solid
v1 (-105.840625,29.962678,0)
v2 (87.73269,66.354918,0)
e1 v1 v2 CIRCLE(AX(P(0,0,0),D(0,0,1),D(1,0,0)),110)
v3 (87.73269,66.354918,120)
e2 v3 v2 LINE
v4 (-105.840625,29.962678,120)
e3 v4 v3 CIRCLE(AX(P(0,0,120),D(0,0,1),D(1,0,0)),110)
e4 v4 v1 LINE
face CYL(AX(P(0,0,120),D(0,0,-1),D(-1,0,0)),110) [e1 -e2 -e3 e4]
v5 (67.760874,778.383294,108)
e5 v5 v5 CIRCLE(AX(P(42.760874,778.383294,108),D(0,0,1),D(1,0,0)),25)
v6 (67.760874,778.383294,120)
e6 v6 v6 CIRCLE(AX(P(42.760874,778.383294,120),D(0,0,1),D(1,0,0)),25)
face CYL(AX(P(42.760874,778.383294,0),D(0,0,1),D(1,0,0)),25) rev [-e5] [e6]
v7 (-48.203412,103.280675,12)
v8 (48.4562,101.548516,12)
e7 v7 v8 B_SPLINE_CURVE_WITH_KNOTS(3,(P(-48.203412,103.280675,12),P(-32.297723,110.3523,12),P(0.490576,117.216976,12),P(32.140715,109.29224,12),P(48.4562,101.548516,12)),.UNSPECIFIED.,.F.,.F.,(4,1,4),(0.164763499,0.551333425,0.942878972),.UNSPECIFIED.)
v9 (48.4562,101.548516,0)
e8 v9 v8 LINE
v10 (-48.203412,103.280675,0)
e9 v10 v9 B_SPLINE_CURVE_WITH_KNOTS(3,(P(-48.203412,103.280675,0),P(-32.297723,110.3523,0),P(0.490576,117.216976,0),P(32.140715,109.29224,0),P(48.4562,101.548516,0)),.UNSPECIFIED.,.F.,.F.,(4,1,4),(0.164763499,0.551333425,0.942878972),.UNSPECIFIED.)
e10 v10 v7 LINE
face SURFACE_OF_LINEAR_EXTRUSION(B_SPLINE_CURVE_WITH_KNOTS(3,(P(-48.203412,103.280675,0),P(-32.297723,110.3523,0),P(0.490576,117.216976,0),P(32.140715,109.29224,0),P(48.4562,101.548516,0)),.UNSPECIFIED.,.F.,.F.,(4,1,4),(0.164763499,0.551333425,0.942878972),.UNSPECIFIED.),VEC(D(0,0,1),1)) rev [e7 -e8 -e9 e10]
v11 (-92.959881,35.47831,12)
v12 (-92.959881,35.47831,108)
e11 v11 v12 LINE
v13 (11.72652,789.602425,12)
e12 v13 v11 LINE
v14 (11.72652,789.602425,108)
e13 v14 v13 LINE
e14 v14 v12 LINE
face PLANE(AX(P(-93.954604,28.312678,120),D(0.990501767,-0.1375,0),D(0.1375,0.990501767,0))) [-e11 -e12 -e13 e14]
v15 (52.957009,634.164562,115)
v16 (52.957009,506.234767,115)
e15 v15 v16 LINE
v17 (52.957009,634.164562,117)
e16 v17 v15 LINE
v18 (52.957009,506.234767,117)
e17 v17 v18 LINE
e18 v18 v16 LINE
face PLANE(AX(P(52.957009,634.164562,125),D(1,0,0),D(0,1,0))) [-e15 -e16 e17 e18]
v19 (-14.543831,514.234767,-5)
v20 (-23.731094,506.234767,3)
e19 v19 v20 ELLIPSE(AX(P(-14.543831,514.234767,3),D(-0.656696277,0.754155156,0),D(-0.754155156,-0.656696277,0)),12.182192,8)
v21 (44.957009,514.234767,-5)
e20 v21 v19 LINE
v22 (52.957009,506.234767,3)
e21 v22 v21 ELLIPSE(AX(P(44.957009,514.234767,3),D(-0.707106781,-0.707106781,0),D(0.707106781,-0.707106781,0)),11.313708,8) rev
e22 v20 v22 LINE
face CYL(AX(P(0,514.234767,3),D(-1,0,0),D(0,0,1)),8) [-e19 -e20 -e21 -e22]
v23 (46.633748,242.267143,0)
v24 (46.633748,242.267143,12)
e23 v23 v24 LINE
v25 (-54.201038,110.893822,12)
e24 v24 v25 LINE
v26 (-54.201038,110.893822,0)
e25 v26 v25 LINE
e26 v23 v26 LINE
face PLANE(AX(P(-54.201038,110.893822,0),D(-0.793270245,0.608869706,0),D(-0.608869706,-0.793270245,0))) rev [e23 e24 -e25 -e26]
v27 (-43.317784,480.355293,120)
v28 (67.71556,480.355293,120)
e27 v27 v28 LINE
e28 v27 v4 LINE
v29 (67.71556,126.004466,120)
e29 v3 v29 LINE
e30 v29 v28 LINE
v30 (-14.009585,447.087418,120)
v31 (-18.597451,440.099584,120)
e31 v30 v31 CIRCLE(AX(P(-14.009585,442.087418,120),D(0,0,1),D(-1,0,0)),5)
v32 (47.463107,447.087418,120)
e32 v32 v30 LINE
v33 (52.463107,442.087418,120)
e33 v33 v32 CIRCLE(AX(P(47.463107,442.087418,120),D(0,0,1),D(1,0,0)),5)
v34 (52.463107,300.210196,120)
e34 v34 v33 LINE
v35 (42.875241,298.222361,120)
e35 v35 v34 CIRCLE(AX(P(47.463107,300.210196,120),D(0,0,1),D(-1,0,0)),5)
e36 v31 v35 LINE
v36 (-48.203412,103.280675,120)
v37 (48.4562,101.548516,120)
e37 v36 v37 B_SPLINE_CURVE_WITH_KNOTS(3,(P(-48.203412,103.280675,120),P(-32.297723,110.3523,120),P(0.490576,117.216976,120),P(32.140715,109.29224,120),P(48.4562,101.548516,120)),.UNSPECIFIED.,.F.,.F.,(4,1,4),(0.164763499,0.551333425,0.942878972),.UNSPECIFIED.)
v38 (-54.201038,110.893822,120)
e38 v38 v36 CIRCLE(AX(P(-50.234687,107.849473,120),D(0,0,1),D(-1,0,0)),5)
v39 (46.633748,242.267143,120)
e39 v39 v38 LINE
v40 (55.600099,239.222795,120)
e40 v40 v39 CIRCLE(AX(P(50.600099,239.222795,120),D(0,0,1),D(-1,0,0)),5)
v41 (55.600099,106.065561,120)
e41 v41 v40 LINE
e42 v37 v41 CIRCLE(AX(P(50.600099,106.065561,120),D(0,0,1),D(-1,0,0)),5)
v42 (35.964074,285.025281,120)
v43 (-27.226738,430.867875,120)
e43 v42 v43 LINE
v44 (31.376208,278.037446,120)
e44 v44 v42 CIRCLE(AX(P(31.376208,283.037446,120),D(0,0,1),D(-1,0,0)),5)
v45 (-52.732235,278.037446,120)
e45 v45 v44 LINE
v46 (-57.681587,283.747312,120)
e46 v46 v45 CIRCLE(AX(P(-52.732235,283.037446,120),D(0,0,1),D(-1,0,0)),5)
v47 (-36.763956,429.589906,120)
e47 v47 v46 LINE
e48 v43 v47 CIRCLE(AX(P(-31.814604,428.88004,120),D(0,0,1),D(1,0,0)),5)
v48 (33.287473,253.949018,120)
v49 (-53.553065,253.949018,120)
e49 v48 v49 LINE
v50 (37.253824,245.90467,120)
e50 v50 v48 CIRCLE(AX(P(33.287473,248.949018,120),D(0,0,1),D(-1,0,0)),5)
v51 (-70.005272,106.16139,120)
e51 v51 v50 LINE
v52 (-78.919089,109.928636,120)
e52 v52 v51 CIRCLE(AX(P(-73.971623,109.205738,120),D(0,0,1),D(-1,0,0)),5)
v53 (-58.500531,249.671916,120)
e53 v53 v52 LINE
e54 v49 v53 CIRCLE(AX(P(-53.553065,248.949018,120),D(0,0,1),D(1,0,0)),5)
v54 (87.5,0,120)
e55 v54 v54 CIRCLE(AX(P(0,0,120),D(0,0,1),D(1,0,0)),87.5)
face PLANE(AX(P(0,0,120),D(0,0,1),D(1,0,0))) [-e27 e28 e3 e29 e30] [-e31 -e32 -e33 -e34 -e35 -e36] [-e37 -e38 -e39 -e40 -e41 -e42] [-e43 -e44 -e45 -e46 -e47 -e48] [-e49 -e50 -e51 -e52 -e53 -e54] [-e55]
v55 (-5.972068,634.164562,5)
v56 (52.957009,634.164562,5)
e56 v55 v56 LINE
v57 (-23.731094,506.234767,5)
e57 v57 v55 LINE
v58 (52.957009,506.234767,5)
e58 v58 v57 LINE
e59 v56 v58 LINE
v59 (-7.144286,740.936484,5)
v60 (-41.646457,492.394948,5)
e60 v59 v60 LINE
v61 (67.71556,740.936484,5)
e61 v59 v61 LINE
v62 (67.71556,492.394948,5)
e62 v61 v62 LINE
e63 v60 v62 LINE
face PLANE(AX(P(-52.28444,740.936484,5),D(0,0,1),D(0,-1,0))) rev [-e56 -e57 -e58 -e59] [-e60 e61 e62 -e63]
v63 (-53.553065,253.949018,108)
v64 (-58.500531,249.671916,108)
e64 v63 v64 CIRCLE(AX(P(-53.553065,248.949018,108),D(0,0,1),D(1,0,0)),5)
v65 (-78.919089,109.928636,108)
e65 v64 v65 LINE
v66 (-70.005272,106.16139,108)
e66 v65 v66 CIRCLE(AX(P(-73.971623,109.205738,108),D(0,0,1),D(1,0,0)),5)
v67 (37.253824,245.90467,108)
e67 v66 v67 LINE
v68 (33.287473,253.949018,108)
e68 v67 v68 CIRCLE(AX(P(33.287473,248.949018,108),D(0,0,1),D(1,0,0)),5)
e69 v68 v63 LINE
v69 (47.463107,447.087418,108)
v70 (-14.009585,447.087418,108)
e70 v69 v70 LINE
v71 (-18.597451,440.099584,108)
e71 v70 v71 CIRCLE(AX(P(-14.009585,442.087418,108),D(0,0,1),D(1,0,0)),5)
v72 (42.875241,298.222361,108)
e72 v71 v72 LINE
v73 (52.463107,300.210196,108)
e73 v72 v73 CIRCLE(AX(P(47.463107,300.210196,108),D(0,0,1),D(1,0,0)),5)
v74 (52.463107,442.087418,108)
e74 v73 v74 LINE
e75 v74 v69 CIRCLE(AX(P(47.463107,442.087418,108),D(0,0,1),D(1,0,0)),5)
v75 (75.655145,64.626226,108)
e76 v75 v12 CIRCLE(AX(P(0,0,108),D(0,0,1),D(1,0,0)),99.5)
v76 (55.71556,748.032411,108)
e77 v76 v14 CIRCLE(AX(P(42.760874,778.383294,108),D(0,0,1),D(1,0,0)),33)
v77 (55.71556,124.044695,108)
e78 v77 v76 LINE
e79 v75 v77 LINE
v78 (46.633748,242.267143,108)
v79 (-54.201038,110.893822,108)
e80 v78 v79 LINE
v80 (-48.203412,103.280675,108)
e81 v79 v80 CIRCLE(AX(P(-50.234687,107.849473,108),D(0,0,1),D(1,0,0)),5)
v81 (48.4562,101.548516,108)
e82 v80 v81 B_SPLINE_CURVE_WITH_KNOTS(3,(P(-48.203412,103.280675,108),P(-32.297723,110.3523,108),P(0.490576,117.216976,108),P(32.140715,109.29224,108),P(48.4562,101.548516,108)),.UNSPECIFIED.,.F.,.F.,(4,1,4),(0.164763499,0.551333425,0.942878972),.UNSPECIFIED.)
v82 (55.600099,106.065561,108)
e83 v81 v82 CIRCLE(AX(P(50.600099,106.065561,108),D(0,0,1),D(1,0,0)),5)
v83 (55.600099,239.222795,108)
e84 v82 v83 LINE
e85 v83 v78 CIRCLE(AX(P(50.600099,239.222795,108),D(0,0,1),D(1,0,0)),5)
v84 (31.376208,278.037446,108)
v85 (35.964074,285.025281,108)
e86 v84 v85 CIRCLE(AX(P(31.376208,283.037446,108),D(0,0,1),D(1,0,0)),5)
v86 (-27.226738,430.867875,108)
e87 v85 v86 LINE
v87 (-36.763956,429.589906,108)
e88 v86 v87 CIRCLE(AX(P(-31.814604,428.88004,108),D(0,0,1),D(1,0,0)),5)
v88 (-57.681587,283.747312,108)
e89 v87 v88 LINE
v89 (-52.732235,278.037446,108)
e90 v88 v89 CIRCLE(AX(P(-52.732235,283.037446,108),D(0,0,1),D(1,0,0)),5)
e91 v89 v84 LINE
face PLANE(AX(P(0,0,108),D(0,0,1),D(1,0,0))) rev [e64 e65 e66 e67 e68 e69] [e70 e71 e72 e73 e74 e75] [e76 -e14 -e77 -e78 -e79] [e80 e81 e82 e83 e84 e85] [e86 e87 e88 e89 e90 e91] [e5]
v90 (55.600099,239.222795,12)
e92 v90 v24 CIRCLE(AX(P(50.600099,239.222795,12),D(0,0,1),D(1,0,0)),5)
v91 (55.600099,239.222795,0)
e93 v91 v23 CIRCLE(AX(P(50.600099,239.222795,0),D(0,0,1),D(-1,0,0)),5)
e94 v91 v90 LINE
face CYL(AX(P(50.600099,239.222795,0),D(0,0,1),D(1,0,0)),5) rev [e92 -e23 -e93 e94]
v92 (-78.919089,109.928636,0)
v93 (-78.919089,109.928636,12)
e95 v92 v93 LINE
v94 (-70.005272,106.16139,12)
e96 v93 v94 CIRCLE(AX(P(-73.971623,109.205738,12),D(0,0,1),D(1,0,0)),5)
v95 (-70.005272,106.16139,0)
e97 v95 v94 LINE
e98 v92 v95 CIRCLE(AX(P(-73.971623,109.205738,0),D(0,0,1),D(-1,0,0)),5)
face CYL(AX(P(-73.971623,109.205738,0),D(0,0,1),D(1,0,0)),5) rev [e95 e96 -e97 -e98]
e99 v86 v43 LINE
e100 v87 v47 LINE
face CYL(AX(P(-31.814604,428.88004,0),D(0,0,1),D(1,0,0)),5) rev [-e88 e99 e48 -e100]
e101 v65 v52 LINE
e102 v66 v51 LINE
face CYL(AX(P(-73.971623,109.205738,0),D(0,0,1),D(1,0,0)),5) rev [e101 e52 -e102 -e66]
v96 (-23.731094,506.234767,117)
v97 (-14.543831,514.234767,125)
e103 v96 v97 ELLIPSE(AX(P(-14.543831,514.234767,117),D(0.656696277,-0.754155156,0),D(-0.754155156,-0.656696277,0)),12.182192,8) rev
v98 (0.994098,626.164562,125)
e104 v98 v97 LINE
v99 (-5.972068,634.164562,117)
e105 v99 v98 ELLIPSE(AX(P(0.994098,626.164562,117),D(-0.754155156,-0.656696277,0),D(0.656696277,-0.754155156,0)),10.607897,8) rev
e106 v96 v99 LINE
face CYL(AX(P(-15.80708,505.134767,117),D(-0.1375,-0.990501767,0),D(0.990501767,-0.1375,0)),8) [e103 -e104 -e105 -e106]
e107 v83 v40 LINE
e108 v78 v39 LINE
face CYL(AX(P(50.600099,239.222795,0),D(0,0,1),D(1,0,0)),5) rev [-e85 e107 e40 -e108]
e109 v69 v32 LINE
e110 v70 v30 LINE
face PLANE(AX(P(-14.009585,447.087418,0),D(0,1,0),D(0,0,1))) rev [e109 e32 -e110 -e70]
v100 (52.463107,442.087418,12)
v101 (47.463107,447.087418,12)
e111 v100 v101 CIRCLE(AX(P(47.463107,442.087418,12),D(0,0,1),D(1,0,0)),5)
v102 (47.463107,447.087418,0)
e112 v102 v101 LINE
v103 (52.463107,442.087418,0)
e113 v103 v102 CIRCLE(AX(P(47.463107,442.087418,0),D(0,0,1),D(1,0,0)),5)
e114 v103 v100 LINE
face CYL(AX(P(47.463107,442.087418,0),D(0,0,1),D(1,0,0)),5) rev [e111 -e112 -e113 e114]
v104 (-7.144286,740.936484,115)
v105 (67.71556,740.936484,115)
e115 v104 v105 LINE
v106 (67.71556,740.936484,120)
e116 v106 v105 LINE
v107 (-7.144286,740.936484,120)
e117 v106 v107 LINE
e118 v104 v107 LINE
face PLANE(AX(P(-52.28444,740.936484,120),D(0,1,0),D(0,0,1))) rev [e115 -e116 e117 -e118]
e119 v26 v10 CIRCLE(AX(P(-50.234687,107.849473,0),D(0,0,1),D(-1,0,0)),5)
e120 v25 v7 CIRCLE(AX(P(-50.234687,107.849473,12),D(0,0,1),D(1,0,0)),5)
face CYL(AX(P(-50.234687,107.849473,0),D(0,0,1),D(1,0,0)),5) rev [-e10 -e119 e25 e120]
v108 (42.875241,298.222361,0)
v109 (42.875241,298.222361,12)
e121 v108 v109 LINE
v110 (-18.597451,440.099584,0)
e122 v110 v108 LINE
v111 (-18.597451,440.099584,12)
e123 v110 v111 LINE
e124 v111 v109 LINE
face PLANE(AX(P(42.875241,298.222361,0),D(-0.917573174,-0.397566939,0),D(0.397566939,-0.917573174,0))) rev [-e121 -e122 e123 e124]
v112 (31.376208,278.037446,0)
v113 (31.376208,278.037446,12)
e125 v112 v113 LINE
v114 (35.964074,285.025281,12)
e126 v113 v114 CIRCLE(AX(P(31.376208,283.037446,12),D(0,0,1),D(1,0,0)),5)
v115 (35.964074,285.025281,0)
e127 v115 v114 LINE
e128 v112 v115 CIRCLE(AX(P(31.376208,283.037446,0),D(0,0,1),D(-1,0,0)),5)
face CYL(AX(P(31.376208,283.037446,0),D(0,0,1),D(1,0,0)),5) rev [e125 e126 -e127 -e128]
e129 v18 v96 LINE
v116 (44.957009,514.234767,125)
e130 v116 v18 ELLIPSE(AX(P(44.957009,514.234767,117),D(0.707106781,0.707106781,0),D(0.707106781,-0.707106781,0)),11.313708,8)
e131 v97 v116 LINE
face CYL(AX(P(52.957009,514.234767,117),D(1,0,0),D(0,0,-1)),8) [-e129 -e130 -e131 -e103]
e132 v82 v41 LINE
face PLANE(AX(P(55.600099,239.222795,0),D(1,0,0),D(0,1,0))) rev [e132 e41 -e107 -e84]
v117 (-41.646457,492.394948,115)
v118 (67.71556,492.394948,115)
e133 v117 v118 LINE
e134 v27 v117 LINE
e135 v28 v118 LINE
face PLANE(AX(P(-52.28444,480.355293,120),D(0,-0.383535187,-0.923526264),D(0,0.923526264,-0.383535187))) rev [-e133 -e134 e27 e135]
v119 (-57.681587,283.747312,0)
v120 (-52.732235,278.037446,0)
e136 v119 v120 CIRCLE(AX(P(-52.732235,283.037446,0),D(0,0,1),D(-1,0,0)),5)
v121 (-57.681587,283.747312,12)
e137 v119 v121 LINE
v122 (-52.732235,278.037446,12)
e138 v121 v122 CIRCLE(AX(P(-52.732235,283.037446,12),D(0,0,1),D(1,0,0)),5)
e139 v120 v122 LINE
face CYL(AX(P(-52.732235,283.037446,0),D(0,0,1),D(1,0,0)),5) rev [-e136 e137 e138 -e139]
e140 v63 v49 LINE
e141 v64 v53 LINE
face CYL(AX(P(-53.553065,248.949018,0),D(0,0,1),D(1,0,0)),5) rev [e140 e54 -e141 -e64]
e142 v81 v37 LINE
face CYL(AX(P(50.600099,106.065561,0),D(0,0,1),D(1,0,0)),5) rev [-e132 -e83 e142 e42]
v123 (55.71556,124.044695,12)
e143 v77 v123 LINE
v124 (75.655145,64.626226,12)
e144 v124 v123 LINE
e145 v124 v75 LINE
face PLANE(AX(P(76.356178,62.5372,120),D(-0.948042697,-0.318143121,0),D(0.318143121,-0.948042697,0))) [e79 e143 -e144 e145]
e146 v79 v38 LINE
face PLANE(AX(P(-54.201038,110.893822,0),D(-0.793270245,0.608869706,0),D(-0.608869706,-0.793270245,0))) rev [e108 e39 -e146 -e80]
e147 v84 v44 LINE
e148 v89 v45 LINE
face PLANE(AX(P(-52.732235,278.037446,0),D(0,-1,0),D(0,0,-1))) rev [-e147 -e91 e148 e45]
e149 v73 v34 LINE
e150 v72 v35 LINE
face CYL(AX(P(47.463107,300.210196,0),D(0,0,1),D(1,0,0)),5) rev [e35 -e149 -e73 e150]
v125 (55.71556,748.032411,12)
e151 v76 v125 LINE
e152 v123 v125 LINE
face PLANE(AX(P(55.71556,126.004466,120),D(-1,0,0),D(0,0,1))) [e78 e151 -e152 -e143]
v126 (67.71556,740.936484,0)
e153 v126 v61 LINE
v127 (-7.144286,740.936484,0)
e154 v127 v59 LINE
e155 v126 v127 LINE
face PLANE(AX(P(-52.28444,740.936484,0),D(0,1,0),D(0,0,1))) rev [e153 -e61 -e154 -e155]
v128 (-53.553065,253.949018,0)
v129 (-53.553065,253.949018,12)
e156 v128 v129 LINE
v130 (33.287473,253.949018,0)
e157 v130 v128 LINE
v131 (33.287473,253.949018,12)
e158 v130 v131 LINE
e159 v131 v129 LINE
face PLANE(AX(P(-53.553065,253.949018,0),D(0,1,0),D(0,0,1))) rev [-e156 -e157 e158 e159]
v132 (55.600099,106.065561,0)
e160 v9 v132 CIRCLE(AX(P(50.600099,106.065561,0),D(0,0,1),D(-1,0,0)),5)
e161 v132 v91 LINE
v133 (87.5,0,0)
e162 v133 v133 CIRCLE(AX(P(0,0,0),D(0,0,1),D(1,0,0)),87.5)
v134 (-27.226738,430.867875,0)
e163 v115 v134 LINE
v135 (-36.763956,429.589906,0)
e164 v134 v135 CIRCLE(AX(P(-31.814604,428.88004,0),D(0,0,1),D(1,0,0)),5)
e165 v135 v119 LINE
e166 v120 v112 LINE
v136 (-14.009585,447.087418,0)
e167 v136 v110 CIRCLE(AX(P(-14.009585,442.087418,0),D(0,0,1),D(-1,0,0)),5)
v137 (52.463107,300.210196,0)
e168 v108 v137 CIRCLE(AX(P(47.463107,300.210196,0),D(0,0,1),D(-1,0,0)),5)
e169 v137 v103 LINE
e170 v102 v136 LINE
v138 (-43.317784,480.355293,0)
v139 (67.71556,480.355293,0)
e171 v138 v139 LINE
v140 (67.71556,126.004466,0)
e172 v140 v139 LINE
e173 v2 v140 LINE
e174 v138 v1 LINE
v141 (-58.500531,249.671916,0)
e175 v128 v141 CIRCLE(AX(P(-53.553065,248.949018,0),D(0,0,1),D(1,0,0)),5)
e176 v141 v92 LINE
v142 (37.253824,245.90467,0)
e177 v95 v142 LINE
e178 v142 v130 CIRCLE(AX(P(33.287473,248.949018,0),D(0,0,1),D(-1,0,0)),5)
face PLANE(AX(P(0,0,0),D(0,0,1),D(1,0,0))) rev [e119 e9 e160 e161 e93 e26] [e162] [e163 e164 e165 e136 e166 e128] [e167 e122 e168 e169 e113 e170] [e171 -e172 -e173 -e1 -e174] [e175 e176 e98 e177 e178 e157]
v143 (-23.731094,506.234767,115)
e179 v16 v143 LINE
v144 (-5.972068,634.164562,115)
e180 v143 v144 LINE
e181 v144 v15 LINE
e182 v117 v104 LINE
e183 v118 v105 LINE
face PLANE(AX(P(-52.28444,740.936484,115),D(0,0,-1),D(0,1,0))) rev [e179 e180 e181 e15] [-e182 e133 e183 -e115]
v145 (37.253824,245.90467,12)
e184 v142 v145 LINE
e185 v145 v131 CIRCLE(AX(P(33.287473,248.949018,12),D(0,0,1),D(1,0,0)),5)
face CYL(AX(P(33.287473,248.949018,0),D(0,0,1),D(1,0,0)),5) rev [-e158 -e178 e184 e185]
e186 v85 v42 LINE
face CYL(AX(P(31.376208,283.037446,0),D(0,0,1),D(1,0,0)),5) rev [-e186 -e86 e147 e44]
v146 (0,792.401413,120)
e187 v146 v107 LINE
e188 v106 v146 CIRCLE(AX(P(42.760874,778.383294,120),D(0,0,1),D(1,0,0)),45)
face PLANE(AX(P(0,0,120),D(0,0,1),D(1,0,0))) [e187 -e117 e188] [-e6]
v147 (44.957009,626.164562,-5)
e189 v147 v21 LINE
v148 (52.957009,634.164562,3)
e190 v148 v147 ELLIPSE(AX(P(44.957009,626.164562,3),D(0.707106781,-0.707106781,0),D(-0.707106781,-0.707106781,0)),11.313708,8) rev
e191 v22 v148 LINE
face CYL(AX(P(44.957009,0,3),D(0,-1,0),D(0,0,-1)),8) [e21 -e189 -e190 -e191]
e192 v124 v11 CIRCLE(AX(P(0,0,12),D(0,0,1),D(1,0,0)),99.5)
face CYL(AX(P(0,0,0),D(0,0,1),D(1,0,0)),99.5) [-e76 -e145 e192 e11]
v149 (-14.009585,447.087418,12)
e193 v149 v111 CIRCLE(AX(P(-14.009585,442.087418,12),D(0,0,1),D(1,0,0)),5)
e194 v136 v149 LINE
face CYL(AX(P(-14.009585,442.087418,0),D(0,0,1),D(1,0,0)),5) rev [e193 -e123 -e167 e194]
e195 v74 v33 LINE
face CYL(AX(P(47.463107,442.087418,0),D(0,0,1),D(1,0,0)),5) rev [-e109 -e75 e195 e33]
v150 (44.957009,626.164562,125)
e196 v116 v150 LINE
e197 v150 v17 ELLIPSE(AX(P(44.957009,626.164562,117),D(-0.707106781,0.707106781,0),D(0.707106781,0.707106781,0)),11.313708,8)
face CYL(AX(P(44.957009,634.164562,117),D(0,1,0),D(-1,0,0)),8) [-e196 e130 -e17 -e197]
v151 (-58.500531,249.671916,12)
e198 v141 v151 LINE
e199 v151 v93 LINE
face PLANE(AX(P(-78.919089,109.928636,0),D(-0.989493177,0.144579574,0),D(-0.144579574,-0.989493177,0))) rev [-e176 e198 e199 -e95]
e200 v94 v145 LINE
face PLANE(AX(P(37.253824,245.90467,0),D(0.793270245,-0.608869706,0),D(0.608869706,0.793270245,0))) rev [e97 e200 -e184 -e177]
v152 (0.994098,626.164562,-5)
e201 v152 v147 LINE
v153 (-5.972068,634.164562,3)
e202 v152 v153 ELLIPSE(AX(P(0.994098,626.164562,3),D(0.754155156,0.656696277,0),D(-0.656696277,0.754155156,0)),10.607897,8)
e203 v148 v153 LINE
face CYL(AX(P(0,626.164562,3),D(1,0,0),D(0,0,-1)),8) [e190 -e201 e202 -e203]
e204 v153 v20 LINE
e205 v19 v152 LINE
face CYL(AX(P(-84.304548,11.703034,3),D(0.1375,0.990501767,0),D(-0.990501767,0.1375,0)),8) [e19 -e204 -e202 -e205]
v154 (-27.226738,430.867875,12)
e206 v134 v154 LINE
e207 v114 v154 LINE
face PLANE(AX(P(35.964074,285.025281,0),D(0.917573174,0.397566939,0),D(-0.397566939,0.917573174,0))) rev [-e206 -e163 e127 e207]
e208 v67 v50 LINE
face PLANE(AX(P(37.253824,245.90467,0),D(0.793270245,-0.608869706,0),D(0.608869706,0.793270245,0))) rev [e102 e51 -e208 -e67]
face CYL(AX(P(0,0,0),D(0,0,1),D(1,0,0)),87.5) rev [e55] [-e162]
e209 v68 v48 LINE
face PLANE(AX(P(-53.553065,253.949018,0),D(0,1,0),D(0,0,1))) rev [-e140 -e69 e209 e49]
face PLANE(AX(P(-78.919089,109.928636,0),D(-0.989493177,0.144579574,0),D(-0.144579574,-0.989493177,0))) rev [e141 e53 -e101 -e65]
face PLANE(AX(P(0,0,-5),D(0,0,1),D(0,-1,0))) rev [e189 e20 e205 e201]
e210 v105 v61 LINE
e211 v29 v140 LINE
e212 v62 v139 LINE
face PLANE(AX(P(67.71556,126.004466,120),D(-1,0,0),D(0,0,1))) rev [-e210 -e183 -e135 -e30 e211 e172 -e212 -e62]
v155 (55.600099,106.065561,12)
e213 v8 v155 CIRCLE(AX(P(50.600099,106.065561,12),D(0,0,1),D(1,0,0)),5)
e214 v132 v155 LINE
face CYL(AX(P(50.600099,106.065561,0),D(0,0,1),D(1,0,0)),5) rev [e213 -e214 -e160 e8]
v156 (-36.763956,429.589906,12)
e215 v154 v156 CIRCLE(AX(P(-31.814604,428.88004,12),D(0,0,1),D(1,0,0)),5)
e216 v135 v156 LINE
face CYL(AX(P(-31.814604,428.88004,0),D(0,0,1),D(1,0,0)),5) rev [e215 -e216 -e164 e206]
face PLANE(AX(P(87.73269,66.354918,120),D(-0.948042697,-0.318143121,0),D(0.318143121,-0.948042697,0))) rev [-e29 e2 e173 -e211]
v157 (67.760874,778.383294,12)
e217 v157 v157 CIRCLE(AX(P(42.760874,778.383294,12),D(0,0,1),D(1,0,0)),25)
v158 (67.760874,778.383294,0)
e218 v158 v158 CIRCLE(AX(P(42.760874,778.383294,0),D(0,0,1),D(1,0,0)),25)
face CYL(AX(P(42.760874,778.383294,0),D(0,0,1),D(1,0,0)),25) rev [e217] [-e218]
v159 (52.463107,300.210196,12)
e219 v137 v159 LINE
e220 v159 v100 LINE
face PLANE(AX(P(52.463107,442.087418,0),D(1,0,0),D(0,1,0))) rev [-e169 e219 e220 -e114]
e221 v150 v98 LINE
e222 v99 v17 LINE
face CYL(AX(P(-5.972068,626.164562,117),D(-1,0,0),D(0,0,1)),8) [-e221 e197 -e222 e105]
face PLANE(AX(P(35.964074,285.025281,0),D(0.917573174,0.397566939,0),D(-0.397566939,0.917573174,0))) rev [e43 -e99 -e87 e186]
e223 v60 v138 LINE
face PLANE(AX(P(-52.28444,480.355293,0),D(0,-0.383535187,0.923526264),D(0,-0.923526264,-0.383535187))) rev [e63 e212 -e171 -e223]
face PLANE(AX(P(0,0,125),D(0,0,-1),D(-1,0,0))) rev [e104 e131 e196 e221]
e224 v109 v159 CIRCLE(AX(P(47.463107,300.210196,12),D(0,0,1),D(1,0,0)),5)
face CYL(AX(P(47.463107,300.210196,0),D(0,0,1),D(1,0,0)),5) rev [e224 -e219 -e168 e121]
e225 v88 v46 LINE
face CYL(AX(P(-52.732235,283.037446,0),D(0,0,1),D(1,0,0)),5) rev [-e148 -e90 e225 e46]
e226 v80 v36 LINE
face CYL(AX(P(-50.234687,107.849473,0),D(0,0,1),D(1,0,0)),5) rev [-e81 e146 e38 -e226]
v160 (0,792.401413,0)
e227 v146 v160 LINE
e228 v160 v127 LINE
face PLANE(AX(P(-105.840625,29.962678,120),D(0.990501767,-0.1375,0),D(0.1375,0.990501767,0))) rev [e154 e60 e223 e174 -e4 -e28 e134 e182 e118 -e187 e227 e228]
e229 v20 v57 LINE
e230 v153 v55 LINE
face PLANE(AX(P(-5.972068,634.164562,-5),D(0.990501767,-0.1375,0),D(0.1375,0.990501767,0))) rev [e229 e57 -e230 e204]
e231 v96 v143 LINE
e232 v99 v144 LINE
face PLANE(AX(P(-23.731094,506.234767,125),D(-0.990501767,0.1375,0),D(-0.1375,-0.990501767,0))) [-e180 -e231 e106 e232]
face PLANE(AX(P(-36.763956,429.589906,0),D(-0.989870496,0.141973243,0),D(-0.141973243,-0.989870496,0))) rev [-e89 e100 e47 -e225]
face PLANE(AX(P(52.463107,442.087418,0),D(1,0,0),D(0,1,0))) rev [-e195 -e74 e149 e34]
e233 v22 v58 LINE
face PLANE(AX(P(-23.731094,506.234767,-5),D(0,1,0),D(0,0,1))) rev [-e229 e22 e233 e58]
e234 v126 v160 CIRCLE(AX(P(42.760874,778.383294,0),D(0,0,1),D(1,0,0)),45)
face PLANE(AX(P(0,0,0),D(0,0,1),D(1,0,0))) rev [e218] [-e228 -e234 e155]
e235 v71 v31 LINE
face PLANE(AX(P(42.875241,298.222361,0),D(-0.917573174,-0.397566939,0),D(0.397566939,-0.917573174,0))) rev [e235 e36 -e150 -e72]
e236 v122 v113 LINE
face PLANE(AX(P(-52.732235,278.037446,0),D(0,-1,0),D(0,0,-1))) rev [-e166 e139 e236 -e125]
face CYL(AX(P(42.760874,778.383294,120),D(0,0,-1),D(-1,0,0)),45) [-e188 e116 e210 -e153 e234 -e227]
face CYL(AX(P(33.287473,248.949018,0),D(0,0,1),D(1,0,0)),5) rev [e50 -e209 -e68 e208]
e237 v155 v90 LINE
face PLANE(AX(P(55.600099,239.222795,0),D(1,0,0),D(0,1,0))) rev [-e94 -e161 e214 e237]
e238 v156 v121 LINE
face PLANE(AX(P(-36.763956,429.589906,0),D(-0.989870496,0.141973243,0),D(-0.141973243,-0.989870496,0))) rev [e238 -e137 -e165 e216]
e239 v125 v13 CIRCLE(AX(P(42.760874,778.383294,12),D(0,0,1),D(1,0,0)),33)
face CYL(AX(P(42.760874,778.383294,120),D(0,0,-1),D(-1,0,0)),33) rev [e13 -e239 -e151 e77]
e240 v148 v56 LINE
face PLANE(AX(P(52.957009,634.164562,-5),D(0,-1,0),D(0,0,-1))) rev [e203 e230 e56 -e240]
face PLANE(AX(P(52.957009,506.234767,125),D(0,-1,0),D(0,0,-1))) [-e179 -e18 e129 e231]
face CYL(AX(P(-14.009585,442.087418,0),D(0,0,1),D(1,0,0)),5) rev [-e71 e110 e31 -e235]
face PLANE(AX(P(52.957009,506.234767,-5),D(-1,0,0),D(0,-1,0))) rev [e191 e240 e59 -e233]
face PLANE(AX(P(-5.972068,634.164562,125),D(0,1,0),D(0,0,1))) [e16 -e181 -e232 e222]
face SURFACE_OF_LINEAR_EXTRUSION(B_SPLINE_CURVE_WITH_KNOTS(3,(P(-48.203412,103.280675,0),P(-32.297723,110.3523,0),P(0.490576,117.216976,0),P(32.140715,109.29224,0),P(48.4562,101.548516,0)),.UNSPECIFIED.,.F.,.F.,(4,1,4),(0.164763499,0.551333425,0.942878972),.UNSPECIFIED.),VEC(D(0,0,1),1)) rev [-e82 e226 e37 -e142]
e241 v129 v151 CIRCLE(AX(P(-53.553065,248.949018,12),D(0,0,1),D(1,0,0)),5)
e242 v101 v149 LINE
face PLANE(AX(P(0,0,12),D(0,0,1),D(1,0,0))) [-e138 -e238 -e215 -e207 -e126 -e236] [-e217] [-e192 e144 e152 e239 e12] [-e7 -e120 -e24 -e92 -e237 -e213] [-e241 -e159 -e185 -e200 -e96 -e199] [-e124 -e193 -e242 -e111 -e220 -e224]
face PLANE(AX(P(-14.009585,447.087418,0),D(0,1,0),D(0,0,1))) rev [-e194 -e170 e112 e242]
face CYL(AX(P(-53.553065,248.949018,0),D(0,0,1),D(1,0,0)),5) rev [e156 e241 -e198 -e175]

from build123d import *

# Parameters (mm, degrees)
BOSS_EXTRUDE1_DEPTH = 120
SKETCH2_R           = 87.5
CUT_EXTRUDE1_DEPTH  = 120
SKETCH3_R           = 25
CUT_EXTRUDE2_DEPTH  = 120
SHELL2_START        = 12
SHELL2_OUTLINE_R    = 25
SHELL2_DEPTH        = 96
CUT_EXTRUDE4_DEPTH  = 120
CUT_EXTRUDE5_DEPTH  = 120
BOSS_EXTRUDE2_DEPTH = 10
BOSS_EXTRUDE3_DEPTH = 10
FILLET1_R           = 8


# Read off the part's stored shape, not the designer's step: Shell2
with BuildPart() as part:
    # Sketch1 → Boss-Extrude1 (new body)
    with BuildSketch(Plane.XY):
        with BuildLine():
            Line((-105.840625, 29.962678445), (0, 792.401413426))
            ThreePointArc((0, 792.401413426), (69.989991069, 814.210311801), (67.715560492, 740.936483843))
            Line((67.715560492, 740.936483843), (67.715560492, 126.004465834))
            Line((67.715560492, 126.004465834), (87.732689968, 66.35491776))
            ThreePointArc((87.732689968, 66.35491776), (20.324199821, -108.106090955), (-105.840625, 29.962678445))
        make_face()
    extrude(amount=BOSS_EXTRUDE1_DEPTH)

    # Sketch2 → Cut-Extrude1 (cut)
    with BuildSketch(Plane.XY.offset(120)):
        Circle(SKETCH2_R)
    extrude(amount=-CUT_EXTRUDE1_DEPTH, mode=Mode.SUBTRACT)

    # Sketch3 → Cut-Extrude2 (cut)
    with BuildSketch(Plane.XY.offset(120)):
        with Locations((42.760873913, 778.383294358)):
            Circle(SKETCH3_R)
    extrude(amount=-CUT_EXTRUDE2_DEPTH, mode=Mode.SUBTRACT)

    # Shell2 outline → Shell2 (cut)
    with BuildSketch(Plane.XY.offset(SHELL2_START)):
        with BuildLine():
            Line((75.655144686, 64.626225966), (55.715560492, 124.0446949))
            Line((55.715560492, 124.0446949), (55.715560492, 748.032411411))
            ThreePointArc((55.715560492, 748.032411411), (65.426599219, 802.367974809), (11.726520361, 789.602425324))
            Line((11.726520361, 789.602425324), (-92.959881421, 35.478309517))
            ThreePointArc((-92.959881421, 35.478309517), (-16.948856501, 98.045837562), (75.655144686, 64.626225966))
        make_face()
        with Locations((42.760873913, 778.383294358)):
            Circle(SHELL2_OUTLINE_R, mode=Mode.SUBTRACT)
    extrude(amount=SHELL2_DEPTH, mode=Mode.SUBTRACT)

    # Sketch4 → Cut-Extrude4 (cut)
    with BuildSketch(Plane.XY.offset(120)):
        with BuildLine():
            Line((-54.201038132, 110.893822017), (46.63374807, 242.267143469))
            ThreePointArc((46.63374807, 242.267143469), (52.207619727, 243.957335897), (55.600099295, 239.222794941))
            Line((55.600099295, 239.222794941), (55.600099295, 106.065561115))
            ThreePointArc((55.600099295, 106.065561115), (53.272224451, 101.839481708), (48.456200434, 101.548515878))
            add(Edge.make_bspline(
                [(-48.203411652, 103.280674868), (-32.29772345, 110.352299936), (0.49057596, 117.216976021), (32.14071495, 109.29223969), (48.456200434, 101.548515878)],
                knots=[0.164763499, 0.164763499, 0.164763499, 0.164763499, 0.551333425, 0.942878972, 0.942878972, 0.942878972, 0.942878972], degree=3))
            ThreePointArc((-48.203411652, 103.280674868), (-54.162298411, 104.755306741), (-54.201038132, 110.893822017))
        make_face()
        with BuildLine():
            Line((-53.553065242, 253.949018208), (33.287473267, 253.949018208))
            ThreePointArc((33.287473267, 253.949018208), (37.771987881, 251.160155626), (37.253824493, 245.90466968))
            Line((37.253824493, 245.90466968), (-70.005272034, 106.161389635))
            ThreePointArc((-70.005272034, 106.161389635), (-75.918077174, 104.600163589), (-78.919089143, 109.928636031))
            Line((-78.919089143, 109.928636031), (-58.500531126, 249.671916076))
            ThreePointArc((-58.500531126, 249.671916076), (-56.823043121, 252.731510068), (-53.553065242, 253.949018208))
        make_face()
        with BuildLine():
            Line((-52.732234928, 278.037445865), (31.376208078, 278.037445865))
            ThreePointArc((31.376208078, 278.037445865), (35.555871549, 280.293286019), (35.964073946, 285.02528056))
            Line((35.964073946, 285.02528056), (-27.226737743, 430.86787452))
            ThreePointArc((-27.226737743, 430.86787452), (-32.478658579, 433.835746738), (-36.76395609, 429.589906043))
            Line((-36.76395609, 429.589906043), (-57.681587406, 283.747312082))
            ThreePointArc((-57.681587406, 283.747312082), (-56.510417764, 279.762490223), (-52.732234928, 278.037445865))
        make_face()
        with BuildLine():
            Line((-14.009585394, 447.087418489), (47.46310653, 447.087418489))
            ThreePointArc((47.46310653, 447.087418489), (50.998640436, 445.622952394), (52.46310653, 442.087418489))
            Line((52.46310653, 442.087418489), (52.46310653, 300.210196021))
            ThreePointArc((52.46310653, 300.210196021), (48.478160878, 295.314313601), (42.875240662, 298.222361327))
            Line((42.875240662, 298.222361327), (-18.597451263, 440.099583794))
            ThreePointArc((-18.597451263, 440.099583794), (-18.189248866, 444.831578335), (-14.009585394, 447.087418489))
        make_face()
    extrude(amount=-CUT_EXTRUDE4_DEPTH, mode=Mode.SUBTRACT)

    # Sketch6 → Cut-Extrude5 (cut)
    with BuildSketch(Plane(origin=(67.715560492, 0, 0), x_dir=(0, 0, -1), z_dir=(1, 0, 0))):
        Polygon((-120, 480.355293397), (-115, 492.394948365), (-115, 740.936483843), (-120, 740.936483843), align=None)
        Polygon((0, 740.936483843), (-5, 740.936483843), (-5, 492.394948365), (0, 480.355293397), align=None)
    extrude(amount=-CUT_EXTRUDE5_DEPTH, mode=Mode.SUBTRACT)

    # Sketch9 → Boss-Extrude2 (add)
    with BuildSketch(Plane(origin=(0, 0, 5), x_dir=(-1, 0, 0), z_dir=(0, 0, -1))):
        Polygon((-52.957009084, 634.164562087), (5.972067956, 634.164562087), (23.731094104, 506.234767355), (-52.957009084, 506.234767355), align=None)
    extrude(amount=BOSS_EXTRUDE2_DEPTH)

    # Sketch7 → Boss-Extrude3 (add)
    with BuildSketch(Plane.XY.offset(115)):
        Polygon((-5.972067956, 634.164562087), (52.957009084, 634.164562087), (52.957009084, 506.234767355), (-23.731094104, 506.234767355), align=None)
    extrude(amount=BOSS_EXTRUDE3_DEPTH)

    # Fillet1
    fillet1_edges = [part.edges().sort_by_distance(p)[0] for p in [
        (52.957009084, 570.199664721, -5),
        (14.61295749, 506.234767355, -5),
        (-14.85158103, 570.199664721, -5),
        (23.492470564, 634.164562087, -5),
        (-14.85158103, 570.199664721, 125),
        (14.61295749, 506.234767355, 125),
        (52.957009084, 570.199664721, 125),
        (23.492470564, 634.164562087, 125),
    ]]
    fillet(fillet1_edges, radius=FILLET1_R)


solid = part.part
